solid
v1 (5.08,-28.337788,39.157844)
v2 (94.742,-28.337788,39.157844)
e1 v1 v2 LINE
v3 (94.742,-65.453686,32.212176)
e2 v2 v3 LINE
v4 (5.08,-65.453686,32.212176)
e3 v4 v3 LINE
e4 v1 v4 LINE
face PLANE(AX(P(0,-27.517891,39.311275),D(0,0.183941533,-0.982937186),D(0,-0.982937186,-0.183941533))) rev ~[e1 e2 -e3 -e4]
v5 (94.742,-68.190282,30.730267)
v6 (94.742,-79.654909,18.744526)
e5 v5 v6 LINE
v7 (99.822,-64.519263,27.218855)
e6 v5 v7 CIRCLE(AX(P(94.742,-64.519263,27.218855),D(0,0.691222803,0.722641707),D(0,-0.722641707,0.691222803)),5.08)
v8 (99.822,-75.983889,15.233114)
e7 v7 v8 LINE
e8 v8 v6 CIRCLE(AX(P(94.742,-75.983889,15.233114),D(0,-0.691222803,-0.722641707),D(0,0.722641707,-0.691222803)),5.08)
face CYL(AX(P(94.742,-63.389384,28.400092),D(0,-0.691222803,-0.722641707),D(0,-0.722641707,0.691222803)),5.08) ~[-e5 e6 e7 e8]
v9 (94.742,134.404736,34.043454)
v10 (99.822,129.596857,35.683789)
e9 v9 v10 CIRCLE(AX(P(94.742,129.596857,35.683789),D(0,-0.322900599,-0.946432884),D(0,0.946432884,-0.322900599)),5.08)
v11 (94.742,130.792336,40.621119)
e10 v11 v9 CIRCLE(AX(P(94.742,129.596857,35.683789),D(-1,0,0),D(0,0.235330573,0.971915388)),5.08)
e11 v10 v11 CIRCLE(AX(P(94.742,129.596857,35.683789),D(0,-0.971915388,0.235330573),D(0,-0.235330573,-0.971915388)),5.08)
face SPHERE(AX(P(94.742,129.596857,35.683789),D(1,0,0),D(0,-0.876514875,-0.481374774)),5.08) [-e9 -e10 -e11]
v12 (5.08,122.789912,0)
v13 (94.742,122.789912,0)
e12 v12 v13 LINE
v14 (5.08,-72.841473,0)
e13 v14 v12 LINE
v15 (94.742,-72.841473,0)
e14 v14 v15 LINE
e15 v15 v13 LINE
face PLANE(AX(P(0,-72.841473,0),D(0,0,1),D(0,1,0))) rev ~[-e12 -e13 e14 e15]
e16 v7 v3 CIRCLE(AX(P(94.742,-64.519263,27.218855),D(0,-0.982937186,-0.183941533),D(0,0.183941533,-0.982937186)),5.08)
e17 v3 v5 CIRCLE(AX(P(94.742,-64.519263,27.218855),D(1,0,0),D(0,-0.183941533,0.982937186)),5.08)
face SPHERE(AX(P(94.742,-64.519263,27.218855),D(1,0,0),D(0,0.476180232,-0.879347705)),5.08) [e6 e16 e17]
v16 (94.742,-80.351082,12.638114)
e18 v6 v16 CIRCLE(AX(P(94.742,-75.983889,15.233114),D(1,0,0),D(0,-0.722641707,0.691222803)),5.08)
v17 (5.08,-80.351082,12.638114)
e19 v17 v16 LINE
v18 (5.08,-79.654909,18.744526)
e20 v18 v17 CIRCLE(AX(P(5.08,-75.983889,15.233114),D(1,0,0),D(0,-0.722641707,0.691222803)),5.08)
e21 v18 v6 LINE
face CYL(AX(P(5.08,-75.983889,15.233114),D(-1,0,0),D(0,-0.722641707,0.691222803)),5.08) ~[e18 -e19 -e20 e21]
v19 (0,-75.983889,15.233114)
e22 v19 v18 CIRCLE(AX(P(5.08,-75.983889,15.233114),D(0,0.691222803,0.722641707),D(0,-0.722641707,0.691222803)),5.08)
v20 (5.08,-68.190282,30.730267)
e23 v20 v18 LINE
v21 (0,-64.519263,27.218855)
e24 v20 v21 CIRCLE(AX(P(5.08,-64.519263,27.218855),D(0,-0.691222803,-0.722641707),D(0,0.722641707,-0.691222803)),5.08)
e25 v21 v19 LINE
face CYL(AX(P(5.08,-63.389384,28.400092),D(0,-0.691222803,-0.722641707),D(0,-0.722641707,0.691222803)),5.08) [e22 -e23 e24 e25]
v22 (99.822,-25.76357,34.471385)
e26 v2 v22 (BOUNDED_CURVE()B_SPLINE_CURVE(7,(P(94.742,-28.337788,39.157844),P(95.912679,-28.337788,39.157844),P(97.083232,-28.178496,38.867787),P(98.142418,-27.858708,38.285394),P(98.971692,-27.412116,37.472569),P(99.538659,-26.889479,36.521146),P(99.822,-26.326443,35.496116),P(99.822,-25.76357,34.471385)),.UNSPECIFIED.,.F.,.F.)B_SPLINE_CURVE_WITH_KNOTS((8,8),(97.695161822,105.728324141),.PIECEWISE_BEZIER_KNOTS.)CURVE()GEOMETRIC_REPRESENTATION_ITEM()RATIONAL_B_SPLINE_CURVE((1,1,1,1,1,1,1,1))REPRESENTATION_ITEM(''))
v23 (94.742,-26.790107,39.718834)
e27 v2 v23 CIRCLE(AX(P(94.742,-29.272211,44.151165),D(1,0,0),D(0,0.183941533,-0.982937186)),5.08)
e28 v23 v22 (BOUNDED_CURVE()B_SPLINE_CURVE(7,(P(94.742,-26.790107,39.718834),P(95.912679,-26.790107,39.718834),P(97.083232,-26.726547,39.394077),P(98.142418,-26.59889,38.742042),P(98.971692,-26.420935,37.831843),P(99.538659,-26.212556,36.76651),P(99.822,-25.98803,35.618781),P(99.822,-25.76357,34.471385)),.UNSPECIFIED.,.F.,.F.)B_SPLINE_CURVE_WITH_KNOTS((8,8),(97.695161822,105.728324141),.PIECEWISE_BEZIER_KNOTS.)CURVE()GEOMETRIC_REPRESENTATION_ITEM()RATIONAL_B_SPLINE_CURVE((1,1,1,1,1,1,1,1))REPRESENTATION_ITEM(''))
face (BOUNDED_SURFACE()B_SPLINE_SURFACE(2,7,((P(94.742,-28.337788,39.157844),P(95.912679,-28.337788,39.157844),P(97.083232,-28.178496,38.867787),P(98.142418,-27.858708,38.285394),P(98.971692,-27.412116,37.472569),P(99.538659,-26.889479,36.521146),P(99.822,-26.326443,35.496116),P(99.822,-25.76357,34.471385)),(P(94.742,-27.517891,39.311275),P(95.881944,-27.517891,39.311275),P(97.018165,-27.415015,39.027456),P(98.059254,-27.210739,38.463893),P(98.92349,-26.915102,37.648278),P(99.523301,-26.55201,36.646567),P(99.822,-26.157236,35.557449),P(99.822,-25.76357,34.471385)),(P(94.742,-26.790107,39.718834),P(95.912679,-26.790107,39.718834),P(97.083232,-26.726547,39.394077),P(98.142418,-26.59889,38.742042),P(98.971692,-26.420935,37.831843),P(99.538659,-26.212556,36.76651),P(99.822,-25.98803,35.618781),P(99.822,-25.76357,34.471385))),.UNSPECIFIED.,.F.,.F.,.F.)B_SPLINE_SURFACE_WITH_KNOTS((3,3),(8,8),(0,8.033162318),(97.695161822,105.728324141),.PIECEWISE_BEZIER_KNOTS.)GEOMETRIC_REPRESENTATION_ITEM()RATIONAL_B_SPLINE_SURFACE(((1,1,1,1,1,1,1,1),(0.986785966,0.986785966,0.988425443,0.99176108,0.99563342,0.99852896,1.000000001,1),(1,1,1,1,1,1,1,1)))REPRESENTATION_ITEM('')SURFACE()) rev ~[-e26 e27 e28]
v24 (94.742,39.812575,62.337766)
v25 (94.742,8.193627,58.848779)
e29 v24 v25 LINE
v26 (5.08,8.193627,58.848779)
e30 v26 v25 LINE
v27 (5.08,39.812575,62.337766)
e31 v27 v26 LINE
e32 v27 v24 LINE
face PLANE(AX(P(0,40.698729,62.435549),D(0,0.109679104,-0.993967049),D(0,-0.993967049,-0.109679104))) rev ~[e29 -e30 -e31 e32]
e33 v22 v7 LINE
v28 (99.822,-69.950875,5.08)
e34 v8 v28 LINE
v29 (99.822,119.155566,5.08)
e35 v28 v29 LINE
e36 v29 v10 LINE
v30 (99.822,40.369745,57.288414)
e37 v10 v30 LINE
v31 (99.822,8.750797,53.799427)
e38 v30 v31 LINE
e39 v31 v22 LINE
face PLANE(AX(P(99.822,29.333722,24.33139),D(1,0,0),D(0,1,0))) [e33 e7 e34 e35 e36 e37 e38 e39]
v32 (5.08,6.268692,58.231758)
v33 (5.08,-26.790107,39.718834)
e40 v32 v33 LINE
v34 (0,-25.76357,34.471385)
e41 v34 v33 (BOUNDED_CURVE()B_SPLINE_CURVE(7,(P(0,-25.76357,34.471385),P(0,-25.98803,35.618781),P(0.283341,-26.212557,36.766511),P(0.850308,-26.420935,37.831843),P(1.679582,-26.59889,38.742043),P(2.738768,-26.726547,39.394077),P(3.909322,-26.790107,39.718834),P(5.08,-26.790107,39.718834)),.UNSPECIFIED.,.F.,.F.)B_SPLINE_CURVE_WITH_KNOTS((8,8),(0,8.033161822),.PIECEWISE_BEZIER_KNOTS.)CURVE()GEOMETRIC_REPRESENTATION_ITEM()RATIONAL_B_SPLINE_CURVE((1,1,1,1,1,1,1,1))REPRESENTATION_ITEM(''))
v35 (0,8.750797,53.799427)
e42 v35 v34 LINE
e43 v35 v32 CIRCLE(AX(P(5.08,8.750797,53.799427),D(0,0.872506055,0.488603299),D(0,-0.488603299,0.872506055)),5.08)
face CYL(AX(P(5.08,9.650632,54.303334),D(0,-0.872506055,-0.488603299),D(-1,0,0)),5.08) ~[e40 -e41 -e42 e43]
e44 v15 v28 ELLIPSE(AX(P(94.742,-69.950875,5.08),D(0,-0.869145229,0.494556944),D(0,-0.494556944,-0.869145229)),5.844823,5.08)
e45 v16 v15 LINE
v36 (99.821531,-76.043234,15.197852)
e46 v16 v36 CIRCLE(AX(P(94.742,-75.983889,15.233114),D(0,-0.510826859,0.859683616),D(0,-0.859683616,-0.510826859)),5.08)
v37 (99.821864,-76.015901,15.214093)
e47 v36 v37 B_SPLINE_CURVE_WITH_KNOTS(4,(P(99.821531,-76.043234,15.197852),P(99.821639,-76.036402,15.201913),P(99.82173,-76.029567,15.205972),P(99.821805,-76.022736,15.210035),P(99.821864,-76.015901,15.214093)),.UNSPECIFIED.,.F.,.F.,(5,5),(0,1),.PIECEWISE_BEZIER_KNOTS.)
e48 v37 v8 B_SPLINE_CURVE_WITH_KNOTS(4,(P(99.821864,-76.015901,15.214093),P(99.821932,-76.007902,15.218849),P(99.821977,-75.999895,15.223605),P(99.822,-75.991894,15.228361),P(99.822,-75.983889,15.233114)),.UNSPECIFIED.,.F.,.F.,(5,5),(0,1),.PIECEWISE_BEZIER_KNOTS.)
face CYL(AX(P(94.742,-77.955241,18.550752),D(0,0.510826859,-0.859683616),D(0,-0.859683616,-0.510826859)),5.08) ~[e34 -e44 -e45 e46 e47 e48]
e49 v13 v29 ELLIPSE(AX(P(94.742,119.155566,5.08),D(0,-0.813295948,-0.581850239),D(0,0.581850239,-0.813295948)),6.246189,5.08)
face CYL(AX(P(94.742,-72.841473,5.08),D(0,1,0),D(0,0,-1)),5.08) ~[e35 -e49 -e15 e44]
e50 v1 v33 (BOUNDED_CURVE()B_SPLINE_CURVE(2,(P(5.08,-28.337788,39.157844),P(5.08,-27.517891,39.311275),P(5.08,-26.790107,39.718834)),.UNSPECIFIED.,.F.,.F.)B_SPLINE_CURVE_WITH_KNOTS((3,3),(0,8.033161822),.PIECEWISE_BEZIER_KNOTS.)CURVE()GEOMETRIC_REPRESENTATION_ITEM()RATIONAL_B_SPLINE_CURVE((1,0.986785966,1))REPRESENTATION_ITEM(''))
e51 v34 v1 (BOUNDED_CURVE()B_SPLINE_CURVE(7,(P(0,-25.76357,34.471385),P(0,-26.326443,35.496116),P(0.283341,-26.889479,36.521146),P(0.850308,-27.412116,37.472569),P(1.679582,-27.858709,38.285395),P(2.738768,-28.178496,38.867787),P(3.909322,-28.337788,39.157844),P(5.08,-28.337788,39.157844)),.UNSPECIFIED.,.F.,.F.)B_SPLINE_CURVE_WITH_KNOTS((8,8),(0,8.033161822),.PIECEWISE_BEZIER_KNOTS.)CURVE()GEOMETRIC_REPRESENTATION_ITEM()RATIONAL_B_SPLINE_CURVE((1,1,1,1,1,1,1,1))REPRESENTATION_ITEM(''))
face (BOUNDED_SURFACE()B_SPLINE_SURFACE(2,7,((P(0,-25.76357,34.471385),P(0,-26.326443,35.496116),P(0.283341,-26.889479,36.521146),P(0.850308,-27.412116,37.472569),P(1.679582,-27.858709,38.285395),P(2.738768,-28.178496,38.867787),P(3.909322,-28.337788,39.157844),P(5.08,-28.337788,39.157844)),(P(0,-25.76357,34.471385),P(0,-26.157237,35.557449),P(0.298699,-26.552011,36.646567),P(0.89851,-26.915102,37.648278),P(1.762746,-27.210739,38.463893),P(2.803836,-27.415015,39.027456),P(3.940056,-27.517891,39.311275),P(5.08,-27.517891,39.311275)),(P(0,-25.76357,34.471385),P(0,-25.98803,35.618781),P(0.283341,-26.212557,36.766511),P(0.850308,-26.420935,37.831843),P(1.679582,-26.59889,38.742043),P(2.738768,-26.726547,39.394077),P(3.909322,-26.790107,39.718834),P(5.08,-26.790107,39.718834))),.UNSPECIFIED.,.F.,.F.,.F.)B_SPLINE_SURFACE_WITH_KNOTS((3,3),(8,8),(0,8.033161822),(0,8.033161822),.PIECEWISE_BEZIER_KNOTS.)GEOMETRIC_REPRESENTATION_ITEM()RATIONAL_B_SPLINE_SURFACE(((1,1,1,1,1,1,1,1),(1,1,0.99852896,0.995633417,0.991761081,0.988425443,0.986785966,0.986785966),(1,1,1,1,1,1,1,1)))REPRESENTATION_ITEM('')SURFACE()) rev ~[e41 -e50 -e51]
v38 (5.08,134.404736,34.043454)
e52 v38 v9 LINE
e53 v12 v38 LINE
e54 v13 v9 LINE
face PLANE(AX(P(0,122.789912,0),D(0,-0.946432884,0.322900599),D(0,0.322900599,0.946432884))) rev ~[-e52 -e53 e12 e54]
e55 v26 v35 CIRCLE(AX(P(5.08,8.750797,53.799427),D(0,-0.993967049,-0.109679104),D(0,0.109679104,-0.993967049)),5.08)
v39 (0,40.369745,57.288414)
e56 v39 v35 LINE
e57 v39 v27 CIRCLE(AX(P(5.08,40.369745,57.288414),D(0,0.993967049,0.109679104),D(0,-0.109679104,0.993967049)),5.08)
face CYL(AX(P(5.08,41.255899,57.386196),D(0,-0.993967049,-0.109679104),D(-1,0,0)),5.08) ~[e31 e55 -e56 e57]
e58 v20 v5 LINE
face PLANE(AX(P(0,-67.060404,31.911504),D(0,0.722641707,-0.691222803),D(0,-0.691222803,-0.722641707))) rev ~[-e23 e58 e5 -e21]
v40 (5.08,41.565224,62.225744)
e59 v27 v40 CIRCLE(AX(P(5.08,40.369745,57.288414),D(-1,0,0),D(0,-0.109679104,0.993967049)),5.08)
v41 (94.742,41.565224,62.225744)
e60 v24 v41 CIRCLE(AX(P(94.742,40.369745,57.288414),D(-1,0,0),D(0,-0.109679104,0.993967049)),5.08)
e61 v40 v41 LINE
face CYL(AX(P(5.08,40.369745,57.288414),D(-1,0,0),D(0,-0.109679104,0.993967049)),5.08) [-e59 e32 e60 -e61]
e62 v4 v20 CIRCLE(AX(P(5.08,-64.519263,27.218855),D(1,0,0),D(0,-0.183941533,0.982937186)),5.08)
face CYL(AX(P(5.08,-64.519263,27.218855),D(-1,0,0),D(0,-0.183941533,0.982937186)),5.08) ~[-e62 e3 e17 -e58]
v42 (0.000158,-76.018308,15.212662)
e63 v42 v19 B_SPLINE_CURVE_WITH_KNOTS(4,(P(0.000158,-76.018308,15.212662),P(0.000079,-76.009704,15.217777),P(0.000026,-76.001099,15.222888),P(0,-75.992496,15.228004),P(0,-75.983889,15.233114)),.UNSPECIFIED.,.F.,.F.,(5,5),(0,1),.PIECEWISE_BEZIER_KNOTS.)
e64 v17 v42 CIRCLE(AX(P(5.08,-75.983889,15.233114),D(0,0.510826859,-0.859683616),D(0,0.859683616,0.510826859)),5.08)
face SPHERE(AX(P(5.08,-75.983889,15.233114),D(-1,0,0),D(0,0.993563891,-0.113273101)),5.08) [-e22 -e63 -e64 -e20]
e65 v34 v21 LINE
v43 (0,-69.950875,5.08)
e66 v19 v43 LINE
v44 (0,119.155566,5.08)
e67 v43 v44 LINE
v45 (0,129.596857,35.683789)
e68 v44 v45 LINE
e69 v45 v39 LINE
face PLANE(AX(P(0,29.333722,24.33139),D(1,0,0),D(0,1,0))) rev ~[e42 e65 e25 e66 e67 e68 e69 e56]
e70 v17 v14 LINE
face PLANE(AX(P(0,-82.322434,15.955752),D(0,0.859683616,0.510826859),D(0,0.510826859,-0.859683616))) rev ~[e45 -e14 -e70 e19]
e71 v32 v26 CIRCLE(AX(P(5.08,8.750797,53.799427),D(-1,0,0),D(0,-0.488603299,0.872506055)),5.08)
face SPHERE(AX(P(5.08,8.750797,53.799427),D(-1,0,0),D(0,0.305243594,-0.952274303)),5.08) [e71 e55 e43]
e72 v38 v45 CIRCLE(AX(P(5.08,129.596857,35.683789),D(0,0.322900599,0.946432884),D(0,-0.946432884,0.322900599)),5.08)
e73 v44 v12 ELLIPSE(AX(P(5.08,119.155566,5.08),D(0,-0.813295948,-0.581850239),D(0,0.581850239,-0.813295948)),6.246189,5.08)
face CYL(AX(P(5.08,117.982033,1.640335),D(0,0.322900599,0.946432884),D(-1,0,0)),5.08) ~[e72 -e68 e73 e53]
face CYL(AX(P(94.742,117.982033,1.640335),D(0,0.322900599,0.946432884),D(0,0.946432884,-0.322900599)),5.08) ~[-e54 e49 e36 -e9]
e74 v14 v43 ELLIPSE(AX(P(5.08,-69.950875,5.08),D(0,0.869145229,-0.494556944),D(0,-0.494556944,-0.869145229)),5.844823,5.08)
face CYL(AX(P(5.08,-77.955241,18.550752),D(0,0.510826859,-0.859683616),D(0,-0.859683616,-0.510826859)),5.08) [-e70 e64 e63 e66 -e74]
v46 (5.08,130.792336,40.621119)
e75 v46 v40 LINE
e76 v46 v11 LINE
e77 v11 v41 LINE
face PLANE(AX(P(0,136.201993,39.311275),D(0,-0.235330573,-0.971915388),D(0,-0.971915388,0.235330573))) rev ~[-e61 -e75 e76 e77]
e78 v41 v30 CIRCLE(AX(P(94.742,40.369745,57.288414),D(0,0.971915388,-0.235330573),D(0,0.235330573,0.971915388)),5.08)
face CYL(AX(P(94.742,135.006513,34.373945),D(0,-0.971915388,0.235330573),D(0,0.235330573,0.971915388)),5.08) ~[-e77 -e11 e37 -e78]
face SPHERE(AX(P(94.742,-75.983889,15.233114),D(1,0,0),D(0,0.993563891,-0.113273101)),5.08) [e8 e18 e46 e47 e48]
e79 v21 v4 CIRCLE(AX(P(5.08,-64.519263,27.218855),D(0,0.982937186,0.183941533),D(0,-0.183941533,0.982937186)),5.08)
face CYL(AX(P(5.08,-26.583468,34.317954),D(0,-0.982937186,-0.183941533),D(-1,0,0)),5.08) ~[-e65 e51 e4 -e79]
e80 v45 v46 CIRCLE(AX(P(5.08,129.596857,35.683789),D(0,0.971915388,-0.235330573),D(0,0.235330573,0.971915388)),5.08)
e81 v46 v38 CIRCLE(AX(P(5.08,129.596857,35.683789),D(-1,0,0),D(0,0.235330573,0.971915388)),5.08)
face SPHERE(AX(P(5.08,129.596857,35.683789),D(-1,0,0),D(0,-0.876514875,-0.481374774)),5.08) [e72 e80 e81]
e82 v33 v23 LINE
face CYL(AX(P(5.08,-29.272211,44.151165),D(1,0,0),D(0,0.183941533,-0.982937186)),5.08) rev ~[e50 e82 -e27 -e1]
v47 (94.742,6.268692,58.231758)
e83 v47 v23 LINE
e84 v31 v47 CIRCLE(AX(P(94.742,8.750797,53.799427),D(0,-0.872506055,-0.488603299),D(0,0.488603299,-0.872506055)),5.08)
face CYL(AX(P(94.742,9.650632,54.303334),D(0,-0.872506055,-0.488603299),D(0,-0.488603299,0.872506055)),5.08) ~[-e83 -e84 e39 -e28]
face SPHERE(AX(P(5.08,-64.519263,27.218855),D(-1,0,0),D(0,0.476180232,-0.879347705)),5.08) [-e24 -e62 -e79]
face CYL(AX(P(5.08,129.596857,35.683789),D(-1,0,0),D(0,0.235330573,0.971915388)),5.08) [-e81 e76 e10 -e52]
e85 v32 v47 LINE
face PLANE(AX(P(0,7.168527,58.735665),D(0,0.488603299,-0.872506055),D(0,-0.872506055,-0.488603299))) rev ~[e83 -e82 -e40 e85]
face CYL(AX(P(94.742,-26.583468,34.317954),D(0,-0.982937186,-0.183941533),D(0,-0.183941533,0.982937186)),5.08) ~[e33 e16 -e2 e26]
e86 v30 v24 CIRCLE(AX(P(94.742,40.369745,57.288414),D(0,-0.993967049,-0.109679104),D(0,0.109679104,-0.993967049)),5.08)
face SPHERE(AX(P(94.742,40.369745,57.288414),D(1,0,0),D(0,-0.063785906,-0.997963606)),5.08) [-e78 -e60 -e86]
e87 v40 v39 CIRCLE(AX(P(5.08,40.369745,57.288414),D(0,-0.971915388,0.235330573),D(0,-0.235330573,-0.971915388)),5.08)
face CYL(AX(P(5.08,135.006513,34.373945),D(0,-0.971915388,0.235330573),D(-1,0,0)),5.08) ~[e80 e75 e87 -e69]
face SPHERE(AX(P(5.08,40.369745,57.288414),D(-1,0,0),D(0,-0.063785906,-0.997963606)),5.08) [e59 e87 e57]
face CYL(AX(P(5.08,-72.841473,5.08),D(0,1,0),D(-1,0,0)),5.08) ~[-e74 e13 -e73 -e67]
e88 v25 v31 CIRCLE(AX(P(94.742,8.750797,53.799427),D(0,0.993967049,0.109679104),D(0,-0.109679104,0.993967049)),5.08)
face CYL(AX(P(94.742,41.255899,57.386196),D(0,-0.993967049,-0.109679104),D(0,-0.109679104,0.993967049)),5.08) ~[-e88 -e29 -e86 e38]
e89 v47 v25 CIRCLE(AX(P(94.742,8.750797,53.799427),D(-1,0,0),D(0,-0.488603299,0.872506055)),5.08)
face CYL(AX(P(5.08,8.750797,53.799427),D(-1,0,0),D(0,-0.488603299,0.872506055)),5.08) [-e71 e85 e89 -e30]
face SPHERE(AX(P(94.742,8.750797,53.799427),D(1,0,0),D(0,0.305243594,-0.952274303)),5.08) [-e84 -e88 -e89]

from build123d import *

# Parameters (mm, degrees)
F1_DEPTH     = 99.822
F2_R         = 5.08
F3_R         = 5.08
F4_F1_R      = 5.08
F4_T2_DEPTH  = 89.662
F4_T7_DEPTH  = 5.1816
F4_T13_DEPTH = 5.1816
F4_T19_DEPTH = 5.1816
F4_T25_DEPTH = 5.1816
F4_T31_DEPTH = 5.1816
F4_T37_DEPTH = 5.1816
F4_T43_DEPTH = 5.1816
F4_T49_DEPTH = 5.1816
F4_T55_DEPTH = 5.1816
F4_T61_DEPTH = 5.1816


# Not quite as in the source:
# - a fillet or chamfer that OpenCascade refuses, or shapes differently, is made with other operations: its cross-section is extruded or revolved along the edge and cut away or added


with BuildPart() as f1:
    # F0 (on Right) → F1 (new body)
    with BuildSketch(Plane.YZ):
        Polygon((-82.3224335909, 15.9557517618), (-72.8414729238, 0), (122.7899119258, 0), (136.201992631, 39.3112748861), (40.6987294555, 62.4355487525), (7.1685267612, 58.7356649339), (-27.5178905576, 39.3112748861), (-67.0604035258, 31.9115035236), align=None)
    extrude(amount=F1_DEPTH)

    # F2
    f2_edges = [f1.edges().sort_by_distance(p)[0] for p in [
        (99.822, -47.289147, 35.611389),
        (99.822, -74.691419, 23.933628),
        (99.822, -77.581953, 7.977876),
        (99.822, 24.97422, 0),
        (99.822, 129.495952, 19.655637),
        (99.822, 88.450361, 50.873412),
        (99.822, 23.933628, 60.585607),
        (99.822, -10.174682, 49.02347),
    ]]
    fillet(f2_edges, radius=F2_R)

    # F3
    f3_edges = [f1.edges().sort_by_distance(p)[0] for p in [
        (0, -47.289147, 35.611389),
        (0, -74.691419, 23.933628),
        (0, -77.581953, 7.977876),
        (0, 24.97422, 0),
        (0, 129.495952, 19.655637),
        (0, 88.450361, 50.873412),
        (0, 23.933628, 60.585607),
        (0, -10.174682, 49.02347),
    ]]
    fillet(f3_edges, radius=F3_R)

    # F4: fillet of radius 5.08 on 8 edges, made by hand

    # F4_f1
    f4_f1_edges = [f1.edges().sort_by_distance(p)[0] for p in [
        (49.911, -27.5178905576, 39.3112748861),
        (1.4878975516, -27.0040618743, 37.8937040228),
        (98.3341025696, -27.0040618325, 37.8937039074),
    ]]
    fillet(f4_f1_edges, radius=F4_F1_R)

    # F4_s3 → F4_t2 (cut)
    with BuildSketch(Plane.YZ.offset(5.08)):
        with BuildLine():
            ThreePointArc((-65.453685614, 32.2121759973), (-66.9382582043, 31.6859414336), (-68.1902824988, 30.7302669295))
            Line((-68.1902824988, 30.7302669295), (-68.2637028962, 30.8004951663))
            Line((-68.2637028962, 30.8004951663), (-67.1112263438, 32.0053564923))
            Line((-67.1112263438, 32.0053564923), (-65.4723740737, 32.3120424155))
            Line((-65.4723740737, 32.3120424155), (-65.453685614, 32.2121759973))
        make_face()
        with BuildLine():
            ThreePointArc((-79.6549091873, 18.7445260612), (-81.0311938802, 15.8085415748), (-80.3510820874, 12.6381137788))
            Line((-80.3510820874, 12.6381137788), (-80.4384259429, 12.5862137699))
            Line((-80.4384259429, 12.5862137699), (-82.4492044764, 15.9702045126))
            Line((-82.4492044764, 15.9702045126), (-79.7283295848, 18.8147542979))
            Line((-79.7283295848, 18.8147542979), (-79.6549091873, 18.7445260612))
        make_face()
        with BuildLine():
            ThreePointArc((6.2686920086, 58.2317575672), (7.2001593092, 58.6369802666), (8.1936269176, 58.8487794151))
            Line((8.1936269176, 58.8487794151), (8.1824835206, 58.9497664672))
            Line((8.1824835206, 58.9497664672), (7.1368813611, 58.8343896965))
            Line((7.1368813611, 58.8343896965), (6.2190499134, 58.3204041823))
            Line((6.2190499134, 58.3204041823), (6.2686920086, 58.2317575672))
        make_face()
        with BuildLine():
            ThreePointArc((39.8125749839, 62.3377662065), (40.6937772364, 62.3580687153), (41.5652241428, 62.2257437701))
            Line((41.5652241428, 62.2257437701), (41.589133729, 62.3244903735))
            Line((41.589133729, 62.3244903735), (40.7053091479, 62.5384914556))
            Line((40.7053091479, 62.5384914556), (39.8014315869, 62.4387532586))
            Line((39.8014315869, 62.4387532586), (39.8125749839, 62.3377662065))
        make_face()
        with BuildLine():
            ThreePointArc((130.792336403, 40.6211188431), (134.0495526612, 38.1291725243), (134.4047361425, 34.0434536277))
            Line((134.4047361425, 34.0434536277), (134.5008937235, 34.0106469268))
            Line((134.5008937235, 34.0106469268), (136.3340953417, 39.3838246104))
            Line((136.3340953417, 39.3838246104), (130.8162459892, 40.7198654465))
            Line((130.8162459892, 40.7198654465), (130.792336403, 40.6211188431))
        make_face()
    extrude(amount=F4_T2_DEPTH, mode=Mode.SUBTRACT)


with BuildPart() as f4_tool5:
    # F4_s6 → F4_t7 (new body)
    with BuildSketch(Plane.YZ.offset(5.08)):
        Polygon((129.5968570941, 35.6837886716), (130.8162459892, 40.7198654465), (136.3340953417, 39.3838246104), (134.5008937235, 34.0106469268), align=None)
    extrude(amount=-F4_T7_DEPTH)

    # F4_s8 → F4_t9 (revolve, cut)
    with BuildSketch(Plane(origin=(5.08, 129.5968570941, 35.6837886716), x_dir=(0, -0.8765148754, -0.4813747742), z_dir=(0, 0.4813747742, -0.8765148754))):
        with BuildLine():
            ThreePointArc((0, -5.08), (5.08, 0), (0, 5.08))
            Line((0, 5.08), (0, -5.08))
        make_face()
    revolve(axis=Axis((5.08, 129.5968570941, 35.6837886716), (-1, 0, 0)), mode=Mode.SUBTRACT)


with BuildPart() as f1_1:
    add(f1.part)

    # F4_t4: cut F4_tool5
    add(f4_tool5.part, mode=Mode.SUBTRACT)


with BuildPart() as f4_tool11:
    # F4_s12 → F4_t13 (new body)
    with BuildSketch(Plane.YZ.offset(94.742)):
        Polygon((129.5968570941, 35.6837886716), (130.8162459892, 40.7198654465), (136.3340953417, 39.3838246104), (134.5008937235, 34.0106469268), align=None)
    extrude(amount=F4_T13_DEPTH)

    # F4_s14 → F4_t15 (revolve, cut)
    with BuildSketch(Plane(origin=(94.742, 129.5968570941, 35.6837886716), x_dir=(0, -0.8765148754, -0.4813747742), z_dir=(0, -0.4813747742, 0.8765148754))):
        with BuildLine():
            ThreePointArc((0, -5.08), (5.08, 0), (0, 5.08))
            Line((0, 5.08), (0, -5.08))
        make_face()
    revolve(axis=Axis((94.742, 129.5968570941, 35.6837886716), (1, 0, 0)), mode=Mode.SUBTRACT)


with BuildPart() as f1_2:
    add(f1_1.part)

    # F4_t10: cut F4_tool11
    add(f4_tool11.part, mode=Mode.SUBTRACT)


with BuildPart() as f4_tool17:
    # F4_s18 → F4_t19 (new body)
    with BuildSketch(Plane.YZ.offset(5.08)):
        Polygon((40.369744834, 57.2884135986), (39.8014315869, 62.4387532586), (40.7053091479, 62.5384914556), (41.589133729, 62.3244903735), align=None)
    extrude(amount=-F4_T19_DEPTH)

    # F4_s20 → F4_t21 (revolve, cut)
    with BuildSketch(Plane(origin=(5.08, 40.369744834, 57.2884135986), x_dir=(0, -0.063785906, -0.9979636056), z_dir=(0, 0.9979636056, -0.063785906))):
        with BuildLine():
            ThreePointArc((0, -5.08), (5.08, 0), (0, 5.08))
            Line((0, 5.08), (0, -5.08))
        make_face()
    revolve(axis=Axis((5.08, 40.369744834, 57.2884135986), (-1, 0, 0)), mode=Mode.SUBTRACT)


with BuildPart() as f1_3:
    add(f1_2.part)

    # F4_t16: cut F4_tool17
    add(f4_tool17.part, mode=Mode.SUBTRACT)


with BuildPart() as f4_tool23:
    # F4_s24 → F4_t25 (new body)
    with BuildSketch(Plane.YZ.offset(94.742)):
        Polygon((40.369744834, 57.2884135986), (39.8014315869, 62.4387532586), (40.7053091479, 62.5384914556), (41.589133729, 62.3244903735), align=None)
    extrude(amount=F4_T25_DEPTH)

    # F4_s26 → F4_t27 (revolve, cut)
    with BuildSketch(Plane(origin=(94.742, 40.369744834, 57.2884135986), x_dir=(0, -0.063785906, -0.9979636056), z_dir=(0, -0.9979636056, 0.063785906))):
        with BuildLine():
            ThreePointArc((0, -5.08), (5.08, 0), (0, 5.08))
            Line((0, 5.08), (0, -5.08))
        make_face()
    revolve(axis=Axis((94.742, 40.369744834, 57.2884135986), (1, 0, 0)), mode=Mode.SUBTRACT)


with BuildPart() as f1_4:
    add(f1_3.part)

    # F4_t22: cut F4_tool23
    add(f4_tool23.part, mode=Mode.SUBTRACT)


with BuildPart() as f4_tool29:
    # F4_s30 → F4_t31 (new body)
    with BuildSketch(Plane.YZ.offset(5.08)):
        Polygon((8.7507967676, 53.7994268073), (6.2190499134, 58.3204041823), (7.1368813611, 58.8343896965), (8.1824835206, 58.9497664672), align=None)
    extrude(amount=-F4_T31_DEPTH)

    # F4_s32 → F4_t33 (revolve, cut)
    with BuildSketch(Plane(origin=(5.08, 8.7507967676, 53.7994268073), x_dir=(0, 0.3052435942, -0.952274303), z_dir=(0, 0.952274303, 0.3052435942))):
        with BuildLine():
            ThreePointArc((0, -5.08), (5.08, 0), (0, 5.08))
            Line((0, 5.08), (0, -5.08))
        make_face()
    revolve(axis=Axis((5.08, 8.7507967676, 53.7994268073), (-1, 0, 0)), mode=Mode.SUBTRACT)


with BuildPart() as f1_5:
    add(f1_4.part)

    # F4_t28: cut F4_tool29
    add(f4_tool29.part, mode=Mode.SUBTRACT)


with BuildPart() as f4_tool35:
    # F4_s36 → F4_t37 (new body)
    with BuildSketch(Plane.YZ.offset(94.742)):
        Polygon((8.7507967676, 53.7994268073), (6.2190499134, 58.3204041823), (7.1368813611, 58.8343896965), (8.1824835206, 58.9497664672), align=None)
    extrude(amount=F4_T37_DEPTH)

    # F4_s38 → F4_t39 (revolve, cut)
    with BuildSketch(Plane(origin=(94.742, 8.7507967676, 53.7994268073), x_dir=(0, 0.3052435942, -0.952274303), z_dir=(0, -0.952274303, -0.3052435942))):
        with BuildLine():
            ThreePointArc((0, -5.08), (5.08, 0), (0, 5.08))
            Line((0, 5.08), (0, -5.08))
        make_face()
    revolve(axis=Axis((94.742, 8.7507967676, 53.7994268073), (1, 0, 0)), mode=Mode.SUBTRACT)


with BuildPart() as f1_6:
    add(f1_5.part)

    # F4_t34: cut F4_tool35
    add(f4_tool35.part, mode=Mode.SUBTRACT)


with BuildPart() as f4_tool41:
    # F4_s42 → F4_t43 (new body)
    with BuildSketch(Plane.YZ.offset(5.08)):
        Polygon((-75.9838893162, 15.2331142218), (-79.7283295848, 18.8147542979), (-82.4492044764, 15.9702045126), (-80.4384259429, 12.5862137699), align=None)
    extrude(amount=-F4_T43_DEPTH)

    # F4_s44 → F4_t45 (revolve, cut)
    with BuildSketch(Plane(origin=(5.08, -75.9838893162, 15.2331142218), x_dir=(0, 0.9935638905, -0.113273101), z_dir=(0, 0.113273101, 0.9935638905))):
        with BuildLine():
            ThreePointArc((0, -5.08), (5.08, 0), (0, 5.08))
            Line((0, 5.08), (0, -5.08))
        make_face()
    revolve(axis=Axis((5.08, -75.9838893162, 15.2331142218), (-1, 0, 0)), mode=Mode.SUBTRACT)


with BuildPart() as f1_7:
    add(f1_6.part)

    # F4_t40: cut F4_tool41
    add(f4_tool41.part, mode=Mode.SUBTRACT)


with BuildPart() as f4_tool47:
    # F4_s48 → F4_t49 (new body)
    with BuildSketch(Plane.YZ.offset(94.742)):
        Polygon((-75.9838893162, 15.2331142218), (-79.7283295848, 18.8147542979), (-82.4492044764, 15.9702045126), (-80.4384259429, 12.5862137699), align=None)
    extrude(amount=F4_T49_DEPTH)

    # F4_s50 → F4_t51 (revolve, cut)
    with BuildSketch(Plane(origin=(94.742, -75.9838893162, 15.2331142218), x_dir=(0, 0.9935638905, -0.113273101), z_dir=(0, -0.113273101, -0.9935638905))):
        with BuildLine():
            ThreePointArc((0, -5.08), (5.08, 0), (0, 5.08))
            Line((0, 5.08), (0, -5.08))
        make_face()
    revolve(axis=Axis((94.742, -75.9838893162, 15.2331142218), (1, 0, 0)), mode=Mode.SUBTRACT)


with BuildPart() as f1_8:
    add(f1_7.part)

    # F4_t46: cut F4_tool47
    add(f4_tool47.part, mode=Mode.SUBTRACT)


with BuildPart() as f4_tool53:
    # F4_s54 → F4_t55 (new body)
    with BuildSketch(Plane.YZ.offset(5.08)):
        Polygon((-64.5192626277, 27.2188550901), (-65.4723740737, 32.3120424155), (-67.1112263438, 32.0053564923), (-68.2637028962, 30.8004951663), align=None)
    extrude(amount=-F4_T55_DEPTH)

    # F4_s56 → F4_t57 (revolve, cut)
    with BuildSketch(Plane(origin=(5.08, -64.5192626277, 27.2188550901), x_dir=(0, 0.4761802316, -0.8793477054), z_dir=(0, 0.8793477054, 0.4761802316))):
        with BuildLine():
            ThreePointArc((0, -5.08), (5.08, 0), (0, 5.08))
            Line((0, 5.08), (0, -5.08))
        make_face()
    revolve(axis=Axis((5.08, -64.5192626277, 27.2188550901), (-1, 0, 0)), mode=Mode.SUBTRACT)


with BuildPart() as f1_9:
    add(f1_8.part)

    # F4_t52: cut F4_tool53
    add(f4_tool53.part, mode=Mode.SUBTRACT)


with BuildPart() as f4_tool59:
    # F4_s60 → F4_t61 (new body)
    with BuildSketch(Plane.YZ.offset(94.742)):
        Polygon((-64.5192626277, 27.2188550901), (-65.4723740737, 32.3120424155), (-67.1112263438, 32.0053564923), (-68.2637028962, 30.8004951663), align=None)
    extrude(amount=F4_T61_DEPTH)

    # F4_s62 → F4_t63 (revolve, cut)
    with BuildSketch(Plane(origin=(94.742, -64.5192626277, 27.2188550901), x_dir=(0, 0.4761802316, -0.8793477054), z_dir=(0, -0.8793477054, -0.4761802316))):
        with BuildLine():
            ThreePointArc((0, -5.08), (5.08, 0), (0, 5.08))
            Line((0, 5.08), (0, -5.08))
        make_face()
    revolve(axis=Axis((94.742, -64.5192626277, 27.2188550901), (1, 0, 0)), mode=Mode.SUBTRACT)


with BuildPart() as f1_10:
    add(f1_9.part)

    # F4_t58: cut F4_tool59
    add(f4_tool59.part, mode=Mode.SUBTRACT)


solid = f1_10.part
